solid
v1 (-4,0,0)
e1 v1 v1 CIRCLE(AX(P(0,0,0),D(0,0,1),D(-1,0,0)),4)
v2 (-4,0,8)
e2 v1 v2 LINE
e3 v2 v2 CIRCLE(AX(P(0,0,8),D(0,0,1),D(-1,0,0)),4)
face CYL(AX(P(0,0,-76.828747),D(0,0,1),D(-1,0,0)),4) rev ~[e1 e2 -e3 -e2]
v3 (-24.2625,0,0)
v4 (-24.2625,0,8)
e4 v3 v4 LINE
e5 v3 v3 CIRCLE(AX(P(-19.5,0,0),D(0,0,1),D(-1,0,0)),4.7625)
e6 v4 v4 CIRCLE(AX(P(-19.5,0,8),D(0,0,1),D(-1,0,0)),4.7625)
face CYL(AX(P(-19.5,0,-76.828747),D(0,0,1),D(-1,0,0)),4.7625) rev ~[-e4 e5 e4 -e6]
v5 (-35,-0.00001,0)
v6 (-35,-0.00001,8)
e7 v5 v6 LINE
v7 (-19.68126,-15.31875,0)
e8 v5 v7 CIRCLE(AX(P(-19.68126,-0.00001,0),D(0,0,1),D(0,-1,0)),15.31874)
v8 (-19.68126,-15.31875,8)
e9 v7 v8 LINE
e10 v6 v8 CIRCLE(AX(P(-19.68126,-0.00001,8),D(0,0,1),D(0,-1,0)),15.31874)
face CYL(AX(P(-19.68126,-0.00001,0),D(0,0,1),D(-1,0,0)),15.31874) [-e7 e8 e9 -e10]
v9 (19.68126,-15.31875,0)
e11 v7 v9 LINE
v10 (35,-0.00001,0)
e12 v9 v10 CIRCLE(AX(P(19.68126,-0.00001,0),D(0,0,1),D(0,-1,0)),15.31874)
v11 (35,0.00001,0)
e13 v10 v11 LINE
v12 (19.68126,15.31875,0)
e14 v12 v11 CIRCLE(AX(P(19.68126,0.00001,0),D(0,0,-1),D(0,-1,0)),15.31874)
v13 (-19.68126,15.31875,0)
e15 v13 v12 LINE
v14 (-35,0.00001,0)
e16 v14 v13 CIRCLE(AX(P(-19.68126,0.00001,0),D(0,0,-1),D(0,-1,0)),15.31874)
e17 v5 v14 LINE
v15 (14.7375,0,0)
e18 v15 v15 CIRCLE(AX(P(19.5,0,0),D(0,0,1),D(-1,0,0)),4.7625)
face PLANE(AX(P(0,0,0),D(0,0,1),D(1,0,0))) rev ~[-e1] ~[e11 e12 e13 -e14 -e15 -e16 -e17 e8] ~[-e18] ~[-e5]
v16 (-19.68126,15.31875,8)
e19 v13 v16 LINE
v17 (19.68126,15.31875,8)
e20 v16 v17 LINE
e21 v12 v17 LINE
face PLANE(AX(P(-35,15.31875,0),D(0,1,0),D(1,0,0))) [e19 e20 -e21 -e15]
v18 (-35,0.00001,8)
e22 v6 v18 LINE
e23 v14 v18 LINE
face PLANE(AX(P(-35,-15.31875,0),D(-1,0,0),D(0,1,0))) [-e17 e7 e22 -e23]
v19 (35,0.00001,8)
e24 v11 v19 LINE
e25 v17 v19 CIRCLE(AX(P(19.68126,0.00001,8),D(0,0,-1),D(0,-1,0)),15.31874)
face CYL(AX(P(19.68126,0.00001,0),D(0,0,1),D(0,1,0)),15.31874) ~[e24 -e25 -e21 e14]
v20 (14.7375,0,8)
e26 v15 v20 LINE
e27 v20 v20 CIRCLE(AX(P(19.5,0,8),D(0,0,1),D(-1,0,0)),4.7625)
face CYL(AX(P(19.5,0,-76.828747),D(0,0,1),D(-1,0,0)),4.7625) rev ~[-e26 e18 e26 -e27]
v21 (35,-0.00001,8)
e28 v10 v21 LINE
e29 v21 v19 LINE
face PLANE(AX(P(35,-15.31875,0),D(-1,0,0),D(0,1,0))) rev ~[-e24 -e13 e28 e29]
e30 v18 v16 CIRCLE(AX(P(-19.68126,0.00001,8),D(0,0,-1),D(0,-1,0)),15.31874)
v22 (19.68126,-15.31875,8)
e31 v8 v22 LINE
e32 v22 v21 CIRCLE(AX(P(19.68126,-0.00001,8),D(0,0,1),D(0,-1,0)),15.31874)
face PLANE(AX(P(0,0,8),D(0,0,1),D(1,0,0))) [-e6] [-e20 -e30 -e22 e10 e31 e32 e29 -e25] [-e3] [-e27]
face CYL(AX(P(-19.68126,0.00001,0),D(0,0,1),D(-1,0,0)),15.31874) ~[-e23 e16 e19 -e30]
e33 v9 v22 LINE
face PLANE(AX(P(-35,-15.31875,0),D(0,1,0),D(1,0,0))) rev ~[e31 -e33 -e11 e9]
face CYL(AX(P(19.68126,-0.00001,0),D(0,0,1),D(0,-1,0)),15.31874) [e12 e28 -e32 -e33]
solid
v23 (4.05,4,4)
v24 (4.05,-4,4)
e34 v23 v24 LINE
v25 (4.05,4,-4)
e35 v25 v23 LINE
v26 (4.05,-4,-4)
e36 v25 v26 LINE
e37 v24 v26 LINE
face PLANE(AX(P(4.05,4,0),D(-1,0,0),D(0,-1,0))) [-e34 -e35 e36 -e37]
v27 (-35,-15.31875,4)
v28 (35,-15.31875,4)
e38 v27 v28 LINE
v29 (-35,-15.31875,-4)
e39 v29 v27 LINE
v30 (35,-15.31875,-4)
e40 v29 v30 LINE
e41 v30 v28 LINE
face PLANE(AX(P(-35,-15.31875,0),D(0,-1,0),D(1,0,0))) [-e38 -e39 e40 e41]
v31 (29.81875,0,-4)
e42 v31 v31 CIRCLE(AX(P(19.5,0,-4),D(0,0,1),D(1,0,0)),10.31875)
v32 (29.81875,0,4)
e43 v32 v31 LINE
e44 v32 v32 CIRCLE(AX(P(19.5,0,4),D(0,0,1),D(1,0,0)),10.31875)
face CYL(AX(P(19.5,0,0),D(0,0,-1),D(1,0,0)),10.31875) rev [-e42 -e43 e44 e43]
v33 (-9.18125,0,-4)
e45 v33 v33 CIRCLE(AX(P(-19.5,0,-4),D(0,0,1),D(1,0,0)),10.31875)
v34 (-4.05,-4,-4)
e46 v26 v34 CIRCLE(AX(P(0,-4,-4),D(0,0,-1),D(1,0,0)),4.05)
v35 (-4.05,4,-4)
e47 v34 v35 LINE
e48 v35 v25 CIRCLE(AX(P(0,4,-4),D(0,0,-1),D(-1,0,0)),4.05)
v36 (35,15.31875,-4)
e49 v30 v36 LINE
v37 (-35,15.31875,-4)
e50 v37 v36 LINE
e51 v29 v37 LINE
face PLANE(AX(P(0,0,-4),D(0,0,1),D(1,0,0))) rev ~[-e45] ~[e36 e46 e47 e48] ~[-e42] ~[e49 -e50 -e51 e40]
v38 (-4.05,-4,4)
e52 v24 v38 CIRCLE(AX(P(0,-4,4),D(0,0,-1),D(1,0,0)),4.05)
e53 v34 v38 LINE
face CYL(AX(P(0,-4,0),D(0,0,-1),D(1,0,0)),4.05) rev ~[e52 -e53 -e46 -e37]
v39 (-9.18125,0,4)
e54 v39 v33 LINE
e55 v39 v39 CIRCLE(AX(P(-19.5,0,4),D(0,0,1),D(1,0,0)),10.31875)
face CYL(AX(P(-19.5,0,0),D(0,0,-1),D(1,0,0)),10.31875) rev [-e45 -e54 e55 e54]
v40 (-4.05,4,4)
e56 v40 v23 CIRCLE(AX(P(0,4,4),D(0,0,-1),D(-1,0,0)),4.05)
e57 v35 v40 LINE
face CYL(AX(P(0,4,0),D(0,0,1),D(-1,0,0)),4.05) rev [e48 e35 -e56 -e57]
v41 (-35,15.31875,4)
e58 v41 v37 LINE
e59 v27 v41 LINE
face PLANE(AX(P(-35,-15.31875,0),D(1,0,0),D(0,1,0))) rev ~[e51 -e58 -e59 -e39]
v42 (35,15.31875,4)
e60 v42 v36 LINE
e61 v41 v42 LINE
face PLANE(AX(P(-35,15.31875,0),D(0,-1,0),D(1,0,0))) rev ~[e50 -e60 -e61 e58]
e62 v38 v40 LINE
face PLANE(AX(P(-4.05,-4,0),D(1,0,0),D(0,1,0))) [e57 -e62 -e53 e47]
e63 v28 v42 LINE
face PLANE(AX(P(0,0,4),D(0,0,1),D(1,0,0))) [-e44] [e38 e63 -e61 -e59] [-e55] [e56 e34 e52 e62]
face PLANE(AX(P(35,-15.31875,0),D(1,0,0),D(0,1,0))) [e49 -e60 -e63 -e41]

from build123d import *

# Parameters (mm, degrees)
F0_W     = 70
F0_H     = 30.6375
F0_R     = 10.31875
F1_DEPTH = 4
F2_DEPTH = 8
F3_D     = 9.525
F4_D     = 8
F5_R     = 15.31874


# Not quite as in the source:
# - a fillet or chamfer is up to 0.001 mm smaller than in the source, because OpenCascade refuses the exact size
# - a length typed as a fraction of an inch, garbled in the dataset ("3 / 203.2 mm" for 3/8 in), is restored


with BuildPart() as f1:
    # F0 (on Top) → F1 (new body, symmetric)
    with BuildSketch(Plane.XY):
        Rectangle(F0_W, F0_H)
        with Locations((-19.5, 0)):
            Circle(F0_R, mode=Mode.SUBTRACT)
        with BuildLine():
            Line((4.05, 4), (4.05, 0))
            Line((4.05, 0), (4.05, -4))
            ThreePointArc((4.05, -4), (0, -8.05), (-4.05, -4))
            Line((-4.05, -4), (-4.05, 0))
            Line((-4.05, 0), (-4.05, 4))
            ThreePointArc((-4.05, 4), (0, 8.05), (4.05, 4))
        make_face(mode=Mode.SUBTRACT)
        with Locations((19.5, 0)):
            Circle(F0_R, mode=Mode.SUBTRACT)
    extrude(amount=F1_DEPTH, both=True)


with BuildPart() as f2:
    # F0 (on Top) → F2 (new body)
    with BuildSketch(Plane.XY):
        Rectangle(F0_W, F0_H)
        with Locations((-19.5, 0)):
            Circle(F0_R, mode=Mode.SUBTRACT)
        with BuildLine():
            Line((4.05, 4), (4.05, 0))
            Line((4.05, 0), (4.05, -4))
            ThreePointArc((4.05, -4), (0, -8.05), (-4.05, -4))
            Line((-4.05, -4), (-4.05, 0))
            Line((-4.05, 0), (-4.05, 4))
            ThreePointArc((-4.05, 4), (0, 8.05), (4.05, 4))
        make_face(mode=Mode.SUBTRACT)
        with Locations((19.5, 0)):
            Circle(F0_R, mode=Mode.SUBTRACT)
        with Locations((-19.5, 0)):
            Circle(F0_R)
        with BuildLine():
            Line((4.05, -4), (4.05, 0))
            ThreePointArc((4.05, 0), (0, -4.05), (-4.05, 0))
            Line((-4.05, 0), (-4.05, -4))
            ThreePointArc((-4.05, -4), (0, -8.05), (4.05, -4))
        make_face()
        with BuildLine():
            ThreePointArc((-4.05, 0), (0, -4.05), (4.05, 0))
            ThreePointArc((4.05, 0), (0, 4.05), (-4.05, 0))
        make_face()
        with BuildLine():
            ThreePointArc((-4.05, 0), (0, 4.05), (4.05, 0))
            Line((4.05, 0), (4.05, 4))
            ThreePointArc((4.05, 4), (0, 8.05), (-4.05, 4))
            Line((-4.05, 4), (-4.05, 0))
        make_face()
        with Locations((19.5, 0)):
            Circle(F0_R)
    extrude(amount=F2_DEPTH)

    # F3 (through all)
    with Locations(Plane(origin=(0, 0, 0), x_dir=(1, 0, 0), z_dir=(0, 0, -1))):
        with Locations((-19.5, 0), (19.5, 0)):
            Hole(F3_D / 2)

    # F4 (through all)
    with Locations(Plane(origin=(0, 0, 0), x_dir=(1, 0, 0), z_dir=(0, 0, -1))):
        with Locations((0, 0)):
            Hole(F4_D / 2)

    # F5 (radius 15.31875 in the source; OpenCascade refuses exactly that, so slightly less here)
    f5_edges = [f2.edges().sort_by_distance(p)[0] for p in [
        (-35, 15.31875, 4),
        (35, 15.31875, 4),
        (-35, -15.31875, 4),
        (35, -15.31875, 4),
    ]]
    fillet(f5_edges, radius=F5_R)


solid = Compound([f1.part, f2.part])
